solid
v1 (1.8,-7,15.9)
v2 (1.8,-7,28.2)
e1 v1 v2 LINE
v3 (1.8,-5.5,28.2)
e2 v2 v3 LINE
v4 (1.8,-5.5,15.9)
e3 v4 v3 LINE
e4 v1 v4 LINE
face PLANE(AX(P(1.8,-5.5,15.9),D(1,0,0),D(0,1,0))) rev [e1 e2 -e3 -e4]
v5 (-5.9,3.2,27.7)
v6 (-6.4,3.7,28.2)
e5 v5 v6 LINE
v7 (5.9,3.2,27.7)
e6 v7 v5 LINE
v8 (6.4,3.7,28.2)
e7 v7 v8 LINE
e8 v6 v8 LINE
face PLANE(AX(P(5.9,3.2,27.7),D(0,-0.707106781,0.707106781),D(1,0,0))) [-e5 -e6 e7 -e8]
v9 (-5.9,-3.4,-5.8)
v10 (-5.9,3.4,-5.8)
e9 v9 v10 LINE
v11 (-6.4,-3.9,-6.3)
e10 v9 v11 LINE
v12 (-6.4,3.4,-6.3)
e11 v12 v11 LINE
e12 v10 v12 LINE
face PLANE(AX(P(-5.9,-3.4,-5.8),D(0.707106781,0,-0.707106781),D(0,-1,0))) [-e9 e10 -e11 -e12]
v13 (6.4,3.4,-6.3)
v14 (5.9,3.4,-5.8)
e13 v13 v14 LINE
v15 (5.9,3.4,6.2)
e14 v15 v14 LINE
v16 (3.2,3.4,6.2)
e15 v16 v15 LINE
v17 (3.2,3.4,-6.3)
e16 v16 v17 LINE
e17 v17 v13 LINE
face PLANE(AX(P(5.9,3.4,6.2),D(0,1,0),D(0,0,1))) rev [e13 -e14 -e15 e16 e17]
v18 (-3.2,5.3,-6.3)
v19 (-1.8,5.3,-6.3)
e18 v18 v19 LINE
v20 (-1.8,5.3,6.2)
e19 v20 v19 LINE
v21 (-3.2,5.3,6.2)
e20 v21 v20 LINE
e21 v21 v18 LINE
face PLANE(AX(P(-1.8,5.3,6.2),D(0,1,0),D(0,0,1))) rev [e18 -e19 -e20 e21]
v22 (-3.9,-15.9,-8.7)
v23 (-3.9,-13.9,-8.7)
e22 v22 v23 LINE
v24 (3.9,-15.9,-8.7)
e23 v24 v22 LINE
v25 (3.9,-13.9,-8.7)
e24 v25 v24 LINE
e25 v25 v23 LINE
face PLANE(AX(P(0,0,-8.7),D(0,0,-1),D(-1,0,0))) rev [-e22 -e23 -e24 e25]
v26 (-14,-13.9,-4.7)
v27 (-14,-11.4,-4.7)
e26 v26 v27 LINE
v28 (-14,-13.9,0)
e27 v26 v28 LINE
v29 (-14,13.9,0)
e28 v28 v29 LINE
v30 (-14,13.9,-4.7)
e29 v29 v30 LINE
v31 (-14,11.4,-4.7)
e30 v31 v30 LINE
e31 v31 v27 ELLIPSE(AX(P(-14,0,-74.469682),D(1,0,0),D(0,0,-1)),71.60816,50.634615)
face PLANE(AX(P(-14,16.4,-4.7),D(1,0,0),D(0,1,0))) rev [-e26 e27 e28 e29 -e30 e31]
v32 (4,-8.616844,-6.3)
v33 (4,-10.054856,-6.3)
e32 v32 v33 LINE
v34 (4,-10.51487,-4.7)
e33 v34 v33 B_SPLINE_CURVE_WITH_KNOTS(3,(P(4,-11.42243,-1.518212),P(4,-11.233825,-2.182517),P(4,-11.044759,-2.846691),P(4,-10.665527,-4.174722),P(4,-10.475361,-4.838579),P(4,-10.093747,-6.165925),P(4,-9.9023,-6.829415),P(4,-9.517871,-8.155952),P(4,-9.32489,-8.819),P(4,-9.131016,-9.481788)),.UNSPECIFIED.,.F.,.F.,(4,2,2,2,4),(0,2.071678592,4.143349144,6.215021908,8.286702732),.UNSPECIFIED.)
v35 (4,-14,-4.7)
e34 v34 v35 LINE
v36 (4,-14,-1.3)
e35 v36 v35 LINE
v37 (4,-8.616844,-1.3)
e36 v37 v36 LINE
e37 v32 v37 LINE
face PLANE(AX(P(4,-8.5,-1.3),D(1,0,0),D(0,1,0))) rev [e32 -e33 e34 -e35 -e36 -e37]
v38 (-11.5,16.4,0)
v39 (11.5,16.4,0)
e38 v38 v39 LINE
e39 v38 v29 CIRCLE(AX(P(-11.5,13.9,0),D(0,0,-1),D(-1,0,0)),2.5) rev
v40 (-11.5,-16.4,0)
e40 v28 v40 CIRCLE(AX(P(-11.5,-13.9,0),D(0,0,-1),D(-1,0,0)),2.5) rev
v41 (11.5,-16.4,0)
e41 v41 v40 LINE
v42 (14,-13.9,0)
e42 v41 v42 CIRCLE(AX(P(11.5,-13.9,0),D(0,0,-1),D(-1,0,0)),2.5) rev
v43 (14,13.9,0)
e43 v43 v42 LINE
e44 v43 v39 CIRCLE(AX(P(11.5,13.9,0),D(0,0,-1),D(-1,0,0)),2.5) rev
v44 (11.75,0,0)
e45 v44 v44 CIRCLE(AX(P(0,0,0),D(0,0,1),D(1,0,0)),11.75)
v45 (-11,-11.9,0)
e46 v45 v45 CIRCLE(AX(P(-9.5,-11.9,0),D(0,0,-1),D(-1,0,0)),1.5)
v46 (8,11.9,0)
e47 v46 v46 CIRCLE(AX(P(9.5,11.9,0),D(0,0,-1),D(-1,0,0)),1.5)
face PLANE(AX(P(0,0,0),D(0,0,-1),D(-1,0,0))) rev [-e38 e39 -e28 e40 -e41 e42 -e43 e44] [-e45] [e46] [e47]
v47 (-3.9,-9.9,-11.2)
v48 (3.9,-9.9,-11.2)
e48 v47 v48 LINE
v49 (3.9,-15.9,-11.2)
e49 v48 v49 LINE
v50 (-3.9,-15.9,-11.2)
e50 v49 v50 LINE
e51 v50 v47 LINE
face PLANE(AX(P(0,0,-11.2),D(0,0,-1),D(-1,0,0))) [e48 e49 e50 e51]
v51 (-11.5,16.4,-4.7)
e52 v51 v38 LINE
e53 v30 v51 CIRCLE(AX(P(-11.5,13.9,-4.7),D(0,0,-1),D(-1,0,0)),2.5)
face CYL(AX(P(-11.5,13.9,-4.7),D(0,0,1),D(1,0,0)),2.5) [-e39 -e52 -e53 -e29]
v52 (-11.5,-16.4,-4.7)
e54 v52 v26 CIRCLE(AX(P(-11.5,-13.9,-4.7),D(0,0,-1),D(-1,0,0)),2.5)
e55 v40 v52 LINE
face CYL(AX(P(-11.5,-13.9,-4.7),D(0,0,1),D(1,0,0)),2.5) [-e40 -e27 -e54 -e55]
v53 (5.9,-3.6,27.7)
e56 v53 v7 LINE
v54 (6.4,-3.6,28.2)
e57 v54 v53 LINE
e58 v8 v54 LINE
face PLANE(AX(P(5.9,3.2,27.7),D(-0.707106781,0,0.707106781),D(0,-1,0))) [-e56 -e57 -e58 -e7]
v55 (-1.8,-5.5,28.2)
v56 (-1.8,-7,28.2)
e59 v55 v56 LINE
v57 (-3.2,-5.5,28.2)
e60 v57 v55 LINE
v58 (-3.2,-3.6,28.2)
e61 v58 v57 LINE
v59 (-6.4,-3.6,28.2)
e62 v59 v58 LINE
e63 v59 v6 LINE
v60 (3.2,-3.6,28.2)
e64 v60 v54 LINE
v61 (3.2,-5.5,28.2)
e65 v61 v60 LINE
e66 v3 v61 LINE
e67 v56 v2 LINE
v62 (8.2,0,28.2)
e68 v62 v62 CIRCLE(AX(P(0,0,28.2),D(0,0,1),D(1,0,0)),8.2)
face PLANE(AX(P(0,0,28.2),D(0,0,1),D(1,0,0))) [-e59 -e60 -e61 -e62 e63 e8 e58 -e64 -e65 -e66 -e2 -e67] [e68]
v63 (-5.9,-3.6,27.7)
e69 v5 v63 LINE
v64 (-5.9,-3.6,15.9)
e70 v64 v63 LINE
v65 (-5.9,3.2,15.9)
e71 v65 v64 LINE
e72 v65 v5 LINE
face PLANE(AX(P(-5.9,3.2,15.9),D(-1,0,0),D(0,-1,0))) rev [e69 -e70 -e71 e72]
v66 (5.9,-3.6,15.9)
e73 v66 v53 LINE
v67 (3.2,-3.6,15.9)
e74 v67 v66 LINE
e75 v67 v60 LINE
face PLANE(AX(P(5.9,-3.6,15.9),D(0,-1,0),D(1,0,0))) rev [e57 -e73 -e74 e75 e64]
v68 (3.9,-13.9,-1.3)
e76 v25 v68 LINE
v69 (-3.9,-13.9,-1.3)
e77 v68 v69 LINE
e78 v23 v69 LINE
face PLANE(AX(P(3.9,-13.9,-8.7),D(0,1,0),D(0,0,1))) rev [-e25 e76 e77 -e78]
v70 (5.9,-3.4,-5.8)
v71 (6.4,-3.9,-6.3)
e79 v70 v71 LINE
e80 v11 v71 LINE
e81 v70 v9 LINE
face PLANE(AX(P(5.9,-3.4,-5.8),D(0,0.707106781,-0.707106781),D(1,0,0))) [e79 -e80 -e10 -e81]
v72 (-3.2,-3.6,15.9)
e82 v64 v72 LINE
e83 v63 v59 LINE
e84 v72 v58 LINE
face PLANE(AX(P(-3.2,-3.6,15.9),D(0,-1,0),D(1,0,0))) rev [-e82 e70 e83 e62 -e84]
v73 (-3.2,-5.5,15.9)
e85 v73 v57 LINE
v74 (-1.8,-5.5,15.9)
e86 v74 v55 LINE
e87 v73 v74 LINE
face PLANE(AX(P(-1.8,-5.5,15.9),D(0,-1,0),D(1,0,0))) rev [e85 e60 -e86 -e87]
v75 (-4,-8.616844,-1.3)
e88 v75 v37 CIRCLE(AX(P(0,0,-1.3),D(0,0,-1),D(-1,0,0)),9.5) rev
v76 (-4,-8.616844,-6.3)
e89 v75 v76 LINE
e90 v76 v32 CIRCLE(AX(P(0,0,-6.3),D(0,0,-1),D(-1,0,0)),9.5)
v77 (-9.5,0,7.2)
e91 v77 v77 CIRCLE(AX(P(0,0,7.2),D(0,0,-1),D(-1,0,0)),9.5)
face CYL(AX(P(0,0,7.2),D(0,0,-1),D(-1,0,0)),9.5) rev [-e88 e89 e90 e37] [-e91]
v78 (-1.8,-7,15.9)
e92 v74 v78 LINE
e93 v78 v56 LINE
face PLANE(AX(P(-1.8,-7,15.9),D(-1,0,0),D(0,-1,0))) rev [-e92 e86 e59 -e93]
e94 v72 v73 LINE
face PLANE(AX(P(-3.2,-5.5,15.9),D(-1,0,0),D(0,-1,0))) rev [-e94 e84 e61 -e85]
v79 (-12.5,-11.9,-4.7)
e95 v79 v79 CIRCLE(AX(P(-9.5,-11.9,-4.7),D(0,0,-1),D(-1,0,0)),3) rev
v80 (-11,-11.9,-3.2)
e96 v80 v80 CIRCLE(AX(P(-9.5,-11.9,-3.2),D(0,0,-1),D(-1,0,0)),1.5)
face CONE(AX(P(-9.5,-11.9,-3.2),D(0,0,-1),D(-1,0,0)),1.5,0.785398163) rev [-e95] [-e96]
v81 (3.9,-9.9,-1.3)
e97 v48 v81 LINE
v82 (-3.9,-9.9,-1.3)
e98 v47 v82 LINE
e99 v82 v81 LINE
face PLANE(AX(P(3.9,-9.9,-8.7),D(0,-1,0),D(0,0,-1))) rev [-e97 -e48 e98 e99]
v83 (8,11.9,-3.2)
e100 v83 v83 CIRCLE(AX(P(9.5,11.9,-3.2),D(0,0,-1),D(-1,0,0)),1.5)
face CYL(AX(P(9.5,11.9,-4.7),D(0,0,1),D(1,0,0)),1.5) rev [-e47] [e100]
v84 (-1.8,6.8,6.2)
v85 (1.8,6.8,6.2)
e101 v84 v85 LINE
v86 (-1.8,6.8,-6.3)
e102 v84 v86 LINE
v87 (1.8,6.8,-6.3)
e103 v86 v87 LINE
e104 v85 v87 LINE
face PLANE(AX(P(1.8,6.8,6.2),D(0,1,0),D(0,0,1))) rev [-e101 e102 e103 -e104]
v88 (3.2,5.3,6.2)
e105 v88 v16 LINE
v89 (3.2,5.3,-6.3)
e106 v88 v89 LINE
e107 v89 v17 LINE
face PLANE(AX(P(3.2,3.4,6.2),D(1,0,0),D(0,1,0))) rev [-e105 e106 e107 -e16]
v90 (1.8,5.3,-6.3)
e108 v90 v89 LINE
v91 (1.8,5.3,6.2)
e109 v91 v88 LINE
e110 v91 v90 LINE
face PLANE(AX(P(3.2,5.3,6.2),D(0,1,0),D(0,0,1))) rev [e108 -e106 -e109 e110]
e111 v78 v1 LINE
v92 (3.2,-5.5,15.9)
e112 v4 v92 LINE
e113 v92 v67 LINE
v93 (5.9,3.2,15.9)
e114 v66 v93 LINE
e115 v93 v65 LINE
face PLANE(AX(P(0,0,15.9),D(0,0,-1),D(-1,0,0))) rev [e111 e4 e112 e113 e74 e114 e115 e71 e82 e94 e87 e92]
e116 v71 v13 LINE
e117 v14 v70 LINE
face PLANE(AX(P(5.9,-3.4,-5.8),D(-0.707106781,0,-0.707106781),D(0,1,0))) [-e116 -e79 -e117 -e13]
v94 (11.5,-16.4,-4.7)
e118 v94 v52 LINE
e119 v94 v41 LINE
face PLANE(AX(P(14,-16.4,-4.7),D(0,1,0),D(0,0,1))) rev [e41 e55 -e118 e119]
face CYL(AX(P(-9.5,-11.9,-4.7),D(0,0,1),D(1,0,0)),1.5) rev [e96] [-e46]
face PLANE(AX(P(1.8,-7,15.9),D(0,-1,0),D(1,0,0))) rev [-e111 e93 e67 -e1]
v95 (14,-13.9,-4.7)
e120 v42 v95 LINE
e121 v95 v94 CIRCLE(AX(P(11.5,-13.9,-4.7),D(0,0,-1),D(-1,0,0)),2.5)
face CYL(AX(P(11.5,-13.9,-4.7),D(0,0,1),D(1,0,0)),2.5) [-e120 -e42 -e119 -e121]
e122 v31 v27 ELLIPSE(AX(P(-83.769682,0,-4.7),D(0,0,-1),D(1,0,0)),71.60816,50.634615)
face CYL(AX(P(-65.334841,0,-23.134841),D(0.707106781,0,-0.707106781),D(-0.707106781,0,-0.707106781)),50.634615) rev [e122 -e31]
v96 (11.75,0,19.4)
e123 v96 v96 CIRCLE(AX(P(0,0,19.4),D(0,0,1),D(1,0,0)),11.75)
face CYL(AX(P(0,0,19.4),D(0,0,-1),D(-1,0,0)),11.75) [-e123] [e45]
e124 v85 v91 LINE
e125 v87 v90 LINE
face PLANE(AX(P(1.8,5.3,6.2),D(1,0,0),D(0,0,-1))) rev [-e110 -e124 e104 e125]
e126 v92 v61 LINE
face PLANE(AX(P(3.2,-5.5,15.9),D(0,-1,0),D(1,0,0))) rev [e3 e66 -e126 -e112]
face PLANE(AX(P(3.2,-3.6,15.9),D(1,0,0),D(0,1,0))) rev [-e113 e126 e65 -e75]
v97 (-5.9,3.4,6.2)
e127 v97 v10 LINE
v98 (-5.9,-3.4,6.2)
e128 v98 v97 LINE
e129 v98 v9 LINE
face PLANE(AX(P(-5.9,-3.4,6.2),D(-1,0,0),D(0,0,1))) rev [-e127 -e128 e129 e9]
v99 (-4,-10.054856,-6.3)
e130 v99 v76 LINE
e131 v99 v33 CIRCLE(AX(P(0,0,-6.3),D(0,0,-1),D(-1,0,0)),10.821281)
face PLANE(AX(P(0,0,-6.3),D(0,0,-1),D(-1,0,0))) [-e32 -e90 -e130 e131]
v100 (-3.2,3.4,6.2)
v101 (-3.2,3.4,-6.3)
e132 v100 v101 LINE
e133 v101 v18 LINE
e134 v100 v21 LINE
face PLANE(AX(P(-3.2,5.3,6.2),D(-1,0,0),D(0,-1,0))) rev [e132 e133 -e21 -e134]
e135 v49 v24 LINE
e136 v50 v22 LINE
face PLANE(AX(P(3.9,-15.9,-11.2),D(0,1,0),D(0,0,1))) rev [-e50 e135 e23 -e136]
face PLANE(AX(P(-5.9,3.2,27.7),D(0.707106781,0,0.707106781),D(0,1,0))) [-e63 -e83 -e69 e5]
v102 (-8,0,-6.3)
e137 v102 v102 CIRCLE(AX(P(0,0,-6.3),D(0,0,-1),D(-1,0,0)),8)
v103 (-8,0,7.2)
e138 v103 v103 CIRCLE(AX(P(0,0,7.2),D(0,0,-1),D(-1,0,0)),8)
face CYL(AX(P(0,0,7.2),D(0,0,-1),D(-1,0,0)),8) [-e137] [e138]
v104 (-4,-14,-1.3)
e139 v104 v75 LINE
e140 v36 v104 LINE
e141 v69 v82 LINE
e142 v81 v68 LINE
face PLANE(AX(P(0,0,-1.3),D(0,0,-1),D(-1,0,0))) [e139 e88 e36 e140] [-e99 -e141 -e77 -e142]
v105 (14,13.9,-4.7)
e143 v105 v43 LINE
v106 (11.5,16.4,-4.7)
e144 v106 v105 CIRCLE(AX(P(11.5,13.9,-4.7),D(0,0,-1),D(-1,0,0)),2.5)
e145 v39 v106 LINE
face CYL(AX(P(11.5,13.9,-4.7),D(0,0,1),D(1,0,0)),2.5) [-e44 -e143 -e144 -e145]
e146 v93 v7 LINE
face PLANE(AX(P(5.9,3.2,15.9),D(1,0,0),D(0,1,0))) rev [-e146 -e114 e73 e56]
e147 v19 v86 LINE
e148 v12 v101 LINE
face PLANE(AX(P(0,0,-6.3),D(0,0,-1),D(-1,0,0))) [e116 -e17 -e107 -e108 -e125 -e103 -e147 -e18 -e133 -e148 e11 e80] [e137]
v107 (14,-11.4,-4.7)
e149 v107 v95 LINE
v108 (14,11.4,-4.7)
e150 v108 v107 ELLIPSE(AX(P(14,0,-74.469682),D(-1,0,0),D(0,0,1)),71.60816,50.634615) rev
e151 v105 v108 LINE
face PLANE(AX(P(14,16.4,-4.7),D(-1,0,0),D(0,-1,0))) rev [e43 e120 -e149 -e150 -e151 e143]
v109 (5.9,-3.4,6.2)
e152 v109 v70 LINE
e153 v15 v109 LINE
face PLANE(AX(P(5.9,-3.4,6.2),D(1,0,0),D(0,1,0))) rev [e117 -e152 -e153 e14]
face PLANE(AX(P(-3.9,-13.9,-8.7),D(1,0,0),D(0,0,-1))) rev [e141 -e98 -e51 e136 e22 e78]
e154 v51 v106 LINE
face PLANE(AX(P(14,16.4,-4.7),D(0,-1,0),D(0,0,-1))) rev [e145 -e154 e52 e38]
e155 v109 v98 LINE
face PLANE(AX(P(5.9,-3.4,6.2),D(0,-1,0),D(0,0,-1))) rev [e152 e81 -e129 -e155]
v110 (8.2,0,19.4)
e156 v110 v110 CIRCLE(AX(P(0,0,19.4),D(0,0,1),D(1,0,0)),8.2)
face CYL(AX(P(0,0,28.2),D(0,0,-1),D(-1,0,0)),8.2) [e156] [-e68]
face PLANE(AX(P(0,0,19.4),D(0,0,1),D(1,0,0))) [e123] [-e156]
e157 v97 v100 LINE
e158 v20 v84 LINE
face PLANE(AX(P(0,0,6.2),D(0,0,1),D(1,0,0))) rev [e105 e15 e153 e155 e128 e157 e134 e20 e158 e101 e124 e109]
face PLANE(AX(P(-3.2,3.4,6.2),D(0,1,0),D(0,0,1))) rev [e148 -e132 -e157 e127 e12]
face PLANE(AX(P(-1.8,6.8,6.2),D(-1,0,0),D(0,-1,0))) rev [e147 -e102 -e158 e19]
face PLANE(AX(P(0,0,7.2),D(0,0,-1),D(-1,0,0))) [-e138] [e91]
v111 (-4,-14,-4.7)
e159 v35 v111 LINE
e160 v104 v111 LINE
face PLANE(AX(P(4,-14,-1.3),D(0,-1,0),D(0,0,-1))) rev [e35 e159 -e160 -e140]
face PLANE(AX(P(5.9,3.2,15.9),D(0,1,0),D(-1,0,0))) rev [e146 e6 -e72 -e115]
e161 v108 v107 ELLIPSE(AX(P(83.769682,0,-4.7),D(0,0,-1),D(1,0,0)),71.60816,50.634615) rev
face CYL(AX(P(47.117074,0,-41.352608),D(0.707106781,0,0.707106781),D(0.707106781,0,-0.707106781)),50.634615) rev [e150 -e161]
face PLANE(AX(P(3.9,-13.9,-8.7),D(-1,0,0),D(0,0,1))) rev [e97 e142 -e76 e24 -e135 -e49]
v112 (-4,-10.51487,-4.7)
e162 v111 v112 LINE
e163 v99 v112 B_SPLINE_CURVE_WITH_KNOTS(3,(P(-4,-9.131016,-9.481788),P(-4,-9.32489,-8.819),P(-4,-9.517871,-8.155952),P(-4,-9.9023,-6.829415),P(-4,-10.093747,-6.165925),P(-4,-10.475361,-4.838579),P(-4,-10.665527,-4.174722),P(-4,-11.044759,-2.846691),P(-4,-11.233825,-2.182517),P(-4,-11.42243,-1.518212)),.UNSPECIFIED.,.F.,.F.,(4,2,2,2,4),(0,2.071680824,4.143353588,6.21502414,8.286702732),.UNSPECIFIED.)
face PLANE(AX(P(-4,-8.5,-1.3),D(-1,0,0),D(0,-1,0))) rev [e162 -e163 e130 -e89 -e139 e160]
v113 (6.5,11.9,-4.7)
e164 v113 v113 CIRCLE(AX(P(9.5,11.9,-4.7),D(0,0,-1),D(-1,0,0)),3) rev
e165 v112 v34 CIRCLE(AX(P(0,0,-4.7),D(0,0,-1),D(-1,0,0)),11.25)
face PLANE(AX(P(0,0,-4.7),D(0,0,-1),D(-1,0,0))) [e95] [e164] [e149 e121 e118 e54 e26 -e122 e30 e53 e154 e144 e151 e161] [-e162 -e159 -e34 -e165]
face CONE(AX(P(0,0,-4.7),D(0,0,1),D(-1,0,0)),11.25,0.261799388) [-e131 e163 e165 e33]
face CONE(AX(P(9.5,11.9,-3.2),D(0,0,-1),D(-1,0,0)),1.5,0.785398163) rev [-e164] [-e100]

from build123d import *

# Parameters (mm, degrees)
ESQUISSE1_R                   = 11.75
BOSS_EXTRU_1_DEPTH            = 19.4
ESQUISSE2_R                   = 8.2
BOSS_EXTRU_2_DEPTH            = 8.8
ENL_V_START                   = -5.9
ENL_V_MAT_EXTRU_1_OUTLINE_W   = 6.8
ENL_V_MAT_EXTRU_1_OUTLINE_H   = 12.3
ENL_V_MAT_EXTRU_1_DEPTH       = 11.8
ENL_V_START_2                 = -1.8
ENL_V_MAT_EXTRU_1_2_OUTLINE_W = 3.4
ENL_V_MAT_EXTRU_1_2_OUTLINE_H = 12.3
ENL_V_MAT_EXTRU_1_2_DEPTH     = 3.6
ENL_V_START_3                 = -3.2
ENL_V_MAT_EXTRU_1_3_OUTLINE_W = 1.9
ENL_V_MAT_EXTRU_1_3_OUTLINE_H = 12.3
ENL_V_MAT_EXTRU_1_3_DEPTH     = 6.4
BOSS_EXTRU_3_START            = -4.7
BOSS_EXTRU_3_OUTLINE_W        = 28
BOSS_EXTRU_3_OUTLINE_H        = 32.8
BOSS_EXTRU_3_OUTLINE_R        = 1.5
BOSS_EXTRU_3_DEPTH            = 4.7
ESQUISSE5_R                   = 11.25
BOSS_EXTRU_4_DEPTH            = 1.6
BOSS_EXTRU_4_TAPER            = 15
ESQUISSE6_R                   = 9.5
ESQUISSE6_R_2                 = 8
ENL_V_MAT_EXTRU_2_DEPTH       = 13.5
ENL_V_MAT_EXTRU_3_DEPTH       = 12.5
CHANFREIN1_SIZE               = 1.5
CONG_1_R                      = 2.5
ENL_V_MAT_EXTRU_4_DEPTH       = 2.5
ENL_V_MAT_EXTRU_4_DEPTH_BACK  = 35.225502188
ENL_V_MAT_EXTRU_5_DEPTH       = 2.5
ENL_V_MAT_EXTRU_5_DEPTH_BACK  = 35.225502188
ESQUISSE10_W                  = 8
ESQUISSE10_H                  = 5.5
ENL_V_MAT_EXTRU_6_DEPTH       = 5
ESQUISSE11_W                  = 7.8
ESQUISSE11_H                  = 4
BOSS_EXTRU_5_DEPTH            = 7.4
ESQUISSE12_W                  = 7.8
ESQUISSE12_H                  = 6
BOSS_EXTRU_6_DEPTH            = 2.5
CHANFREIN2_SIZE               = 0.5


# Read off the part's stored shape, not the designer's step: Enlèv. mat.-Extru.1, Boss.-Extru.3
with BuildPart() as part:
    # Esquisse1 → Boss.-Extru.1 (new body)
    with BuildSketch(Plane.XY):
        Circle(ESQUISSE1_R)
    extrude(amount=BOSS_EXTRU_1_DEPTH)

    # Esquisse2 → Boss.-Extru.2 (add)
    with BuildSketch(Plane.XY.offset(19.4)):
        Circle(ESQUISSE2_R)
    extrude(amount=BOSS_EXTRU_2_DEPTH)

    # Enlèv. mat.-Extru.1 outline → Enlèv. mat.-Extru.1 (cut)
    with BuildSketch(Plane.YZ.offset(ENL_V_START)):
        with Locations((-0.2, 22.05)):
            Rectangle(ENL_V_MAT_EXTRU_1_OUTLINE_W, ENL_V_MAT_EXTRU_1_OUTLINE_H)
    extrude(amount=ENL_V_MAT_EXTRU_1_DEPTH, mode=Mode.SUBTRACT)

    # Enl_v. mat.-Extru.1 2 outline → Enl_v. mat.-Extru.1 2 (cut)
    with BuildSketch(Plane.YZ.offset(ENL_V_START_2)):
        with Locations((-5.3, 22.05)):
            Rectangle(ENL_V_MAT_EXTRU_1_2_OUTLINE_W, ENL_V_MAT_EXTRU_1_2_OUTLINE_H)
    extrude(amount=ENL_V_MAT_EXTRU_1_2_DEPTH, mode=Mode.SUBTRACT)

    # Enl_v. mat.-Extru.1 3 outline → Enl_v. mat.-Extru.1 3 (cut)
    with BuildSketch(Plane.YZ.offset(ENL_V_START_3)):
        with Locations((-4.55, 22.05)):
            Rectangle(ENL_V_MAT_EXTRU_1_3_OUTLINE_W, ENL_V_MAT_EXTRU_1_3_OUTLINE_H)
    extrude(amount=ENL_V_MAT_EXTRU_1_3_DEPTH, mode=Mode.SUBTRACT)

    # Boss.-Extru.3 outline → Boss.-Extru.3 (add)
    with BuildSketch(Plane.XY.offset(BOSS_EXTRU_3_START)):
        Rectangle(BOSS_EXTRU_3_OUTLINE_W, BOSS_EXTRU_3_OUTLINE_H)
        with Locations((-9.5, -11.9)):
            Circle(BOSS_EXTRU_3_OUTLINE_R, mode=Mode.SUBTRACT)
        with Locations((9.5, 11.9)):
            Circle(BOSS_EXTRU_3_OUTLINE_R, mode=Mode.SUBTRACT)
    extrude(amount=BOSS_EXTRU_3_DEPTH)

    # Esquisse5 → Boss.-Extru.4 (add)
    with BuildSketch(Plane(origin=(0, 0, -4.7), x_dir=(-1, 0, 0), z_dir=(0, 0, -1))):
        Circle(ESQUISSE5_R)
    extrude(amount=BOSS_EXTRU_4_DEPTH, taper=BOSS_EXTRU_4_TAPER)

    # Esquisse6 → Enlèv. mat.-Extru.2 (cut)
    with BuildSketch(Plane(origin=(0, 0, -6.3), x_dir=(-1, 0, 0), z_dir=(0, 0, -1))):
        Circle(ESQUISSE6_R)
        Circle(ESQUISSE6_R_2, mode=Mode.SUBTRACT)
    extrude(amount=-ENL_V_MAT_EXTRU_2_DEPTH, mode=Mode.SUBTRACT)

    # Esquisse7 → Enlèv. mat.-Extru.3 (cut)
    with BuildSketch(Plane(origin=(0, 0, -6.3), x_dir=(-1, 0, 0), z_dir=(0, 0, -1))):
        Polygon((-3.2, 3.4), (-3.2, 5.3), (-1.8, 5.3), (-1.8, 6.8), (1.8, 6.8), (1.8, 5.3), (3.2, 5.3), (3.2, 3.4), (5.9, 3.4), (5.9, -3.4), (-5.9, -3.4), (-5.9, 3.4), align=None)
    extrude(amount=-ENL_V_MAT_EXTRU_3_DEPTH, mode=Mode.SUBTRACT)

    # Chanfrein1
    chanfrein1_edges = [part.edges().sort_by_distance(p)[0] for p in [
        (8, 11.9, -4.7),
        (-11, -11.9, -4.7),
    ]]
    chamfer(chanfrein1_edges, length=CHANFREIN1_SIZE)

    # Congé1
    cong_1_edges = [part.edges().sort_by_distance(p)[0] for p in [
        (14, 16.4, -2.35),
        (14, -16.4, -2.35),
        (-14, -16.4, -2.35),
        (-14, 16.4, -2.35),
    ]]
    fillet(cong_1_edges, radius=CONG_1_R)

    # Esquisse8 → Enlèv. mat.-Extru.4 (cut, two sides: drawn at the far end of the back side and taken through both)
    with BuildSketch(Plane(origin=(-4.65, 0, 4.65), x_dir=(0, 1, 0), z_dir=(0.7071067811865464, 0, -0.7071067811865488)).offset(-ENL_V_MAT_EXTRU_4_DEPTH_BACK)):
        with BuildLine():
            Line((-11.4, -13.222896808), (11.4, -13.222896808))
            ThreePointArc((11.4, -13.222896808), (0, -11.922896808), (-11.4, -13.222896808))
        make_face()
    extrude(amount=ENL_V_MAT_EXTRU_4_DEPTH + ENL_V_MAT_EXTRU_4_DEPTH_BACK, mode=Mode.SUBTRACT)

    # Esquisse9 → Enlèv. mat.-Extru.5 (cut, two sides: drawn at the far end of the back side and taken through both)
    with BuildSketch(Plane(origin=(4.65, 0, 4.65), x_dir=(0, -1, 0), z_dir=(-0.7071067811865464, 0, -0.7071067811865488)).offset(-ENL_V_MAT_EXTRU_5_DEPTH_BACK)):
        with BuildLine():
            Line((-11.4, -13.222896808), (11.4, -13.222896808))
            ThreePointArc((11.4, -13.222896808), (0, -11.922896808), (-11.4, -13.222896808))
        make_face()
    extrude(amount=ENL_V_MAT_EXTRU_5_DEPTH + ENL_V_MAT_EXTRU_5_DEPTH_BACK, mode=Mode.SUBTRACT)

    # Esquisse10 → Enlèv. mat.-Extru.6 (cut)
    with BuildSketch(Plane(origin=(0, 0, -6.3), x_dir=(-1, 0, 0), z_dir=(0, 0, -1))):
        with Locations((0, -11.25)):
            Rectangle(ESQUISSE10_W, ESQUISSE10_H)
    extrude(amount=-ENL_V_MAT_EXTRU_6_DEPTH, mode=Mode.SUBTRACT)

    # Esquisse11 → Boss.-Extru.5 (add)
    with BuildSketch(Plane(origin=(0, 0, -1.3), x_dir=(-1, 0, 0), z_dir=(0, 0, -1))):
        with Locations((0, -11.9)):
            Rectangle(ESQUISSE11_W, ESQUISSE11_H)
    extrude(amount=BOSS_EXTRU_5_DEPTH)

    # Esquisse12 → Boss.-Extru.6 (add)
    with BuildSketch(Plane(origin=(0, 0, -8.7), x_dir=(-1, 0, 0), z_dir=(0, 0, -1))):
        with Locations((0, -12.9)):
            Rectangle(ESQUISSE12_W, ESQUISSE12_H)
    extrude(amount=BOSS_EXTRU_6_DEPTH)

    # Chanfrein2
    chanfrein2_edges = [part.edges().sort_by_distance(p)[0] for p in [
        (5.9, -0.2, 28.2),
        (0, 3.2, 28.2),
        (-5.9, -0.2, 28.2),
        (5.9, 0, -6.3),
        (0, -3.4, -6.3),
        (-5.9, 0, -6.3),
    ]]
    chamfer(chanfrein2_edges, length=CHANFREIN2_SIZE)


solid = part.part
